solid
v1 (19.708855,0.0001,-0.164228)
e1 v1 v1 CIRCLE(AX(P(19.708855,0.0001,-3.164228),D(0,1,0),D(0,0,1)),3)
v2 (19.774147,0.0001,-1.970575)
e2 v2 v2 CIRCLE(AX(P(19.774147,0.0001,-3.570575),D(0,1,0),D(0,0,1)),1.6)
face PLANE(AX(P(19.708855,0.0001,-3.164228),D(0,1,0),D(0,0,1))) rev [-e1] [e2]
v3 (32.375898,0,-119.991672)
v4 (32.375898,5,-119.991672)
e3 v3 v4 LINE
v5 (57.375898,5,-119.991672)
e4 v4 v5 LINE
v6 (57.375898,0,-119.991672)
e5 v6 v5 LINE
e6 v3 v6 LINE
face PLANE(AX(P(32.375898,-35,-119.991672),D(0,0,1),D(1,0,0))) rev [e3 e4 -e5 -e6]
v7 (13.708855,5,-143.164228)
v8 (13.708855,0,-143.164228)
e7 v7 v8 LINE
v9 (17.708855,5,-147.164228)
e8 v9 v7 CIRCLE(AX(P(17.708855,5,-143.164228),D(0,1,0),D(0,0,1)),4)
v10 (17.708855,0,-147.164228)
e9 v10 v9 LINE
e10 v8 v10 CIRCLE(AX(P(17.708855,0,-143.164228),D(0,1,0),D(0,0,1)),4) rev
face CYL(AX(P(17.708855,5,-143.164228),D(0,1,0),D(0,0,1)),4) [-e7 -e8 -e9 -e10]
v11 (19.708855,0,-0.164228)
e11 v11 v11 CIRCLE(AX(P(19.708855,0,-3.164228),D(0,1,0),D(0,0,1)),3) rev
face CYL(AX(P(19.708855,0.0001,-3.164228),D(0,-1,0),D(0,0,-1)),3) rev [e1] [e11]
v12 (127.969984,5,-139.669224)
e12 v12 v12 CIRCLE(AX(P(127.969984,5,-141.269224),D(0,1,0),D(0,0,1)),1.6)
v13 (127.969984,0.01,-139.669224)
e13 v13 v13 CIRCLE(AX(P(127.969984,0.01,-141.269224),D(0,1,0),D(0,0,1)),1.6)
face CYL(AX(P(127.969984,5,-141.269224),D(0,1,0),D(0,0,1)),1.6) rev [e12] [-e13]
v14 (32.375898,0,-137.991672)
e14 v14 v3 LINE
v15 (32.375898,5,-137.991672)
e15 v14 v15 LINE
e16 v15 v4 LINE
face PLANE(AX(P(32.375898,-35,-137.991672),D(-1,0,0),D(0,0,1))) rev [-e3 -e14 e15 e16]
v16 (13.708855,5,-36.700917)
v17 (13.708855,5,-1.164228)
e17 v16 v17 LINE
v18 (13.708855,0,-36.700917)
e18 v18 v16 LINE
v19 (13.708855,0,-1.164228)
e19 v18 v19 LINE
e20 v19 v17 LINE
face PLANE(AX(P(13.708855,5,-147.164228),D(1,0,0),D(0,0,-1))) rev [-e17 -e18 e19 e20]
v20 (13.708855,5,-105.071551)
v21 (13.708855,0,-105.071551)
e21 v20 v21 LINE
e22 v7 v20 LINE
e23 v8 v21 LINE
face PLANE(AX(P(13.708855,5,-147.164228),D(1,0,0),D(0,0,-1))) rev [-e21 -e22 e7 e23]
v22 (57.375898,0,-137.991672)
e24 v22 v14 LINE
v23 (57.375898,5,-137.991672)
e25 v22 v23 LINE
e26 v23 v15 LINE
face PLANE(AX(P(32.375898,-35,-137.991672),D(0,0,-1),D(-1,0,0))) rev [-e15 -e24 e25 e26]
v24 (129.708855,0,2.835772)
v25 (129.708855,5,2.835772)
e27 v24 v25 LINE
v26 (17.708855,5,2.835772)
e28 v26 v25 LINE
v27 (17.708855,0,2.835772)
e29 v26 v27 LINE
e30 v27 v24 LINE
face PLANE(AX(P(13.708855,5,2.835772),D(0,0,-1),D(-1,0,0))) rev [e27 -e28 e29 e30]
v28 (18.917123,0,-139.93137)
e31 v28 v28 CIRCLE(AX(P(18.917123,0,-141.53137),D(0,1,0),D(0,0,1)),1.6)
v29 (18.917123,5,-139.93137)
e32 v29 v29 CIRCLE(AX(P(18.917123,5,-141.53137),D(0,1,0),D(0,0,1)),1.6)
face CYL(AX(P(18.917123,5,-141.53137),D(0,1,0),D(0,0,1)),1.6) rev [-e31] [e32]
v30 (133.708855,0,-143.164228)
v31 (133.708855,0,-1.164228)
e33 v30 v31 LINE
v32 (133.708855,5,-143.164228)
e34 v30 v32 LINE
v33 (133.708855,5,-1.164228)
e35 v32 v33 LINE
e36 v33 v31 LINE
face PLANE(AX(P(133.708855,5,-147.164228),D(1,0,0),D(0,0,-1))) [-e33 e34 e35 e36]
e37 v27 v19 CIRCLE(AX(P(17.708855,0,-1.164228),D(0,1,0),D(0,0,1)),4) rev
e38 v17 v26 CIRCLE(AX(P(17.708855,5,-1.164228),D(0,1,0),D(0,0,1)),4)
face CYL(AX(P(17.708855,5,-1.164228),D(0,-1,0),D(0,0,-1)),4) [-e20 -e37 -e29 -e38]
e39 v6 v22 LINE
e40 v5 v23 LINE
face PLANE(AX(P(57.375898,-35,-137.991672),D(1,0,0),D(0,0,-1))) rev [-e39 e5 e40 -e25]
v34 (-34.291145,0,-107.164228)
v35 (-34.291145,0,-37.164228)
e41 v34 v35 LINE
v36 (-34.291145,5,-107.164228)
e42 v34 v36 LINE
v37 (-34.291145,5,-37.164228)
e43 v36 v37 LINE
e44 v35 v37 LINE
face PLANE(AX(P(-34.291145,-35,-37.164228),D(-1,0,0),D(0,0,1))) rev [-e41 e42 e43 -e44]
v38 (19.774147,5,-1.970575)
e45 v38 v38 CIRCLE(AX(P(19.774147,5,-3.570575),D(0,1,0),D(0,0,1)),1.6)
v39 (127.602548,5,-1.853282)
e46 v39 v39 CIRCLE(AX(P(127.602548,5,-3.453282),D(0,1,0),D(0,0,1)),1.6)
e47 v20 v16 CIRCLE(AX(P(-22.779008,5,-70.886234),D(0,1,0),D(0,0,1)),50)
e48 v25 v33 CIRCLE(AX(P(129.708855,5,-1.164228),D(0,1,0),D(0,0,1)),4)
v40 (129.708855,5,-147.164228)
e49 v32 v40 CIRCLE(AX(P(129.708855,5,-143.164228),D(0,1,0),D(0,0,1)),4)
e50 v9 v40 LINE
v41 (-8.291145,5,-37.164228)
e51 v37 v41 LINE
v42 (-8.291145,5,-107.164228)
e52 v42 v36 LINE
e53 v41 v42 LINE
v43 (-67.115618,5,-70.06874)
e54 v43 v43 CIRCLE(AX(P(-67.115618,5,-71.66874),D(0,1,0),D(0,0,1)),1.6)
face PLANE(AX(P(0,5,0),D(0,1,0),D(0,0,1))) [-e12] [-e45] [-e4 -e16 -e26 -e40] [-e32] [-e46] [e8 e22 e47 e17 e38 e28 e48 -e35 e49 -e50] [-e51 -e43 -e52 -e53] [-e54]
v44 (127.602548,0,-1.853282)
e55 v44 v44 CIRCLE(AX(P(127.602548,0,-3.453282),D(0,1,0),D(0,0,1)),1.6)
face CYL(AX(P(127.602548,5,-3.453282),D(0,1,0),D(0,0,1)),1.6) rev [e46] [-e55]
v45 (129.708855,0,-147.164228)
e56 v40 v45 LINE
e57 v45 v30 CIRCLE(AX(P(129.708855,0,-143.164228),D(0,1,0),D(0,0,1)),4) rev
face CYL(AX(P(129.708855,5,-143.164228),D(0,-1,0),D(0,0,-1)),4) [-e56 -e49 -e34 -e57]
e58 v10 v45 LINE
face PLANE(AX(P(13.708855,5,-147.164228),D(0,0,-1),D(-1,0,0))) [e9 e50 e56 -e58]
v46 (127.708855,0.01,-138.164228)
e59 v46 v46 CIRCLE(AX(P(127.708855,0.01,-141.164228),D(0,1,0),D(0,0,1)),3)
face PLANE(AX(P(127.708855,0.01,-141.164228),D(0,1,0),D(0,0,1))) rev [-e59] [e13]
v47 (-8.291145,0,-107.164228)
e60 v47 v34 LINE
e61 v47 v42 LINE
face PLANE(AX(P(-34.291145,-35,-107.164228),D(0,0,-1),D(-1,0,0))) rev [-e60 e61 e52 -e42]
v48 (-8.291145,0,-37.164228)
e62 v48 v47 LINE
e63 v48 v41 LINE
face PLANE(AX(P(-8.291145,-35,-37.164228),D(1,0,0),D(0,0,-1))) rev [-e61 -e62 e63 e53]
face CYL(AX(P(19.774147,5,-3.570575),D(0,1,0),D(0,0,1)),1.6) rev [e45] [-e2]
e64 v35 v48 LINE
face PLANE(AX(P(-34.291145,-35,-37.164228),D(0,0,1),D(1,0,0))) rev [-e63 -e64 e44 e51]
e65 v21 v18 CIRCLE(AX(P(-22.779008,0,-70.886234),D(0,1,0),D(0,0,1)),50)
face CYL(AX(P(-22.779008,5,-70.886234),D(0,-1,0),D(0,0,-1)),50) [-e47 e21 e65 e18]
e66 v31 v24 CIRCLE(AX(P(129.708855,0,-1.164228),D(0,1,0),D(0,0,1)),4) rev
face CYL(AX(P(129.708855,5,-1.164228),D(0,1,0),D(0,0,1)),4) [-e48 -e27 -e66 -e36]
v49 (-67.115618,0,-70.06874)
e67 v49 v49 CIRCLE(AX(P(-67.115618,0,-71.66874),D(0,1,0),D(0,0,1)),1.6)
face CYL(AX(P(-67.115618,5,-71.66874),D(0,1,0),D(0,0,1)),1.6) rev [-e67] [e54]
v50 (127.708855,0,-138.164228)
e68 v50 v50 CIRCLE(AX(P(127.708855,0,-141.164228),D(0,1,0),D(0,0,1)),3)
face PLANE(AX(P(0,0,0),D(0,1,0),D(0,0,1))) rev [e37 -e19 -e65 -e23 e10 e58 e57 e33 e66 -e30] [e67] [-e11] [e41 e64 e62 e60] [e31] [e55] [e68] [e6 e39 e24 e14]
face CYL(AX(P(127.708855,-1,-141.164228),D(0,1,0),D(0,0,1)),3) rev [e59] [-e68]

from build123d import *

# Parameters (mm, degrees)
SKETCH8_W                           = 120
SKETCH8_H                           = 150
BOSS_EXTRUDE3_DEPTH                 = 5
SKETCH9_R                           = 50
BOSS_EXTRUDE4_DEPTH                 = 5
BOSS_EXTRUDE8_DEPTH                 = 3
BOSS_EXTRUDE8_DEPTH_BACK            = 0.0001
SKETCH29_R                          = 3
CUT_EXTRUDE9_OUTLINE_R              = 3
CUT_EXTRUDE9_DEPTH                  = 0.01
F_7_32_0_21875_DIAMETER_HOLE1_D     = 3.2
F_7_32_0_21875_DIAMETER_HOLE1_DEPTH = 5
F_7_32_0_21875_DIAMETER_HOLE1_TIP   = 0.96137699
FILLET3_R                           = 4
SKETCH38_W                          = 26
SKETCH38_H                          = 70
CUT_EXTRUDE10_DEPTH                 = 40
SKETCH39_W                          = 25
SKETCH39_H                          = 18
CUT_EXTRUDE11_DEPTH                 = 40


# Read off the part's stored shape, not the designer's step: Cut-Extrude9
with BuildPart() as part:
    # Sketch8 → Boss-Extrude3 (new body)
    with BuildSketch(Plane(origin=(0, 0, 0), x_dir=(1, 0, 0), z_dir=(0, 1, 0))):
        with Locations((73.708855083, 72.164227744)):
            Rectangle(SKETCH8_W, SKETCH8_H)
    extrude(amount=BOSS_EXTRUDE3_DEPTH)

    # Sketch9 → Boss-Extrude4 (add)
    with BuildSketch(Plane(origin=(0, 0, 0), x_dir=(1, 0, 0), z_dir=(0, 1, 0))):
        with Locations((-22.779007595, 70.886233868)):
            Circle(SKETCH9_R)
    extrude(amount=BOSS_EXTRUDE4_DEPTH)

    # Sketch29 → Boss-Extrude8 (add, two sides: drawn at the far end of the back side and taken through both)
    with BuildSketch(Plane(origin=(0, 0, 0), x_dir=(1, 0, 0), z_dir=(0, 1, 0)).offset(-BOSS_EXTRUDE8_DEPTH_BACK)):
        with Locations(Location((19.708855083, 3.164227744, 0), (0, 0, 270))):
            Circle(SKETCH29_R)
    extrude(amount=BOSS_EXTRUDE8_DEPTH + BOSS_EXTRUDE8_DEPTH_BACK)

    # Cut-Extrude9 outline → Cut-Extrude9 (cut)
    with BuildSketch(Plane(origin=(0, 0, 0), x_dir=(1, 0, 0), z_dir=(0, 1, 0))):
        with Locations((127.708855083, 141.164227744)):
            Circle(CUT_EXTRUDE9_OUTLINE_R)
    extrude(amount=CUT_EXTRUDE9_DEPTH, mode=Mode.SUBTRACT)

    # 7/32 (0.21875) Diameter Hole1
    with Locations(Plane(origin=(0, 5, 0), x_dir=(1, 0, 0), z_dir=(0, 1, 0))):
        with Locations((18.917123201, 141.531370062), (127.969984407, 141.269223761), (127.602547564, 3.45328248), (19.774147178, 3.570575466), (-67.115618064, 71.668740496)):
            Hole(F_7_32_0_21875_DIAMETER_HOLE1_D / 2, depth=F_7_32_0_21875_DIAMETER_HOLE1_DEPTH)
            with Locations((0, 0, -(F_7_32_0_21875_DIAMETER_HOLE1_DEPTH + F_7_32_0_21875_DIAMETER_HOLE1_TIP / 2))):  # 118° drill point
                Cone(0, F_7_32_0_21875_DIAMETER_HOLE1_D / 2, F_7_32_0_21875_DIAMETER_HOLE1_TIP, mode=Mode.SUBTRACT)

    # Fillet3
    fillet3_edges = [part.edges().sort_by_distance(p)[0] for p in [
        (13.708855083, 2.5, -147.164227744),
        (133.708855083, 2.5, -147.164227744),
        (133.708855083, 2.5, 2.835772256),
        (13.708855083, 2.5, 2.835772256),
    ]]
    fillet(fillet3_edges, radius=FILLET3_R)

    # Sketch38 → Cut-Extrude10 (cut)
    with BuildSketch(Plane(origin=(0, 5, 0), x_dir=(1, 0, 0), z_dir=(0, 1, 0))):
        with Locations((-21.291144917, 72.164227744)):
            Rectangle(SKETCH38_W, SKETCH38_H)
    extrude(amount=-CUT_EXTRUDE10_DEPTH, mode=Mode.SUBTRACT)

    # Sketch39 → Cut-Extrude11 (cut)
    with BuildSketch(Plane(origin=(0, 5, 0), x_dir=(1, 0, 0), z_dir=(0, 1, 0))):
        with Locations((44.875898376, 128.991672485)):
            Rectangle(SKETCH39_W, SKETCH39_H)
    extrude(amount=-CUT_EXTRUDE11_DEPTH, mode=Mode.SUBTRACT)


solid = part.part
